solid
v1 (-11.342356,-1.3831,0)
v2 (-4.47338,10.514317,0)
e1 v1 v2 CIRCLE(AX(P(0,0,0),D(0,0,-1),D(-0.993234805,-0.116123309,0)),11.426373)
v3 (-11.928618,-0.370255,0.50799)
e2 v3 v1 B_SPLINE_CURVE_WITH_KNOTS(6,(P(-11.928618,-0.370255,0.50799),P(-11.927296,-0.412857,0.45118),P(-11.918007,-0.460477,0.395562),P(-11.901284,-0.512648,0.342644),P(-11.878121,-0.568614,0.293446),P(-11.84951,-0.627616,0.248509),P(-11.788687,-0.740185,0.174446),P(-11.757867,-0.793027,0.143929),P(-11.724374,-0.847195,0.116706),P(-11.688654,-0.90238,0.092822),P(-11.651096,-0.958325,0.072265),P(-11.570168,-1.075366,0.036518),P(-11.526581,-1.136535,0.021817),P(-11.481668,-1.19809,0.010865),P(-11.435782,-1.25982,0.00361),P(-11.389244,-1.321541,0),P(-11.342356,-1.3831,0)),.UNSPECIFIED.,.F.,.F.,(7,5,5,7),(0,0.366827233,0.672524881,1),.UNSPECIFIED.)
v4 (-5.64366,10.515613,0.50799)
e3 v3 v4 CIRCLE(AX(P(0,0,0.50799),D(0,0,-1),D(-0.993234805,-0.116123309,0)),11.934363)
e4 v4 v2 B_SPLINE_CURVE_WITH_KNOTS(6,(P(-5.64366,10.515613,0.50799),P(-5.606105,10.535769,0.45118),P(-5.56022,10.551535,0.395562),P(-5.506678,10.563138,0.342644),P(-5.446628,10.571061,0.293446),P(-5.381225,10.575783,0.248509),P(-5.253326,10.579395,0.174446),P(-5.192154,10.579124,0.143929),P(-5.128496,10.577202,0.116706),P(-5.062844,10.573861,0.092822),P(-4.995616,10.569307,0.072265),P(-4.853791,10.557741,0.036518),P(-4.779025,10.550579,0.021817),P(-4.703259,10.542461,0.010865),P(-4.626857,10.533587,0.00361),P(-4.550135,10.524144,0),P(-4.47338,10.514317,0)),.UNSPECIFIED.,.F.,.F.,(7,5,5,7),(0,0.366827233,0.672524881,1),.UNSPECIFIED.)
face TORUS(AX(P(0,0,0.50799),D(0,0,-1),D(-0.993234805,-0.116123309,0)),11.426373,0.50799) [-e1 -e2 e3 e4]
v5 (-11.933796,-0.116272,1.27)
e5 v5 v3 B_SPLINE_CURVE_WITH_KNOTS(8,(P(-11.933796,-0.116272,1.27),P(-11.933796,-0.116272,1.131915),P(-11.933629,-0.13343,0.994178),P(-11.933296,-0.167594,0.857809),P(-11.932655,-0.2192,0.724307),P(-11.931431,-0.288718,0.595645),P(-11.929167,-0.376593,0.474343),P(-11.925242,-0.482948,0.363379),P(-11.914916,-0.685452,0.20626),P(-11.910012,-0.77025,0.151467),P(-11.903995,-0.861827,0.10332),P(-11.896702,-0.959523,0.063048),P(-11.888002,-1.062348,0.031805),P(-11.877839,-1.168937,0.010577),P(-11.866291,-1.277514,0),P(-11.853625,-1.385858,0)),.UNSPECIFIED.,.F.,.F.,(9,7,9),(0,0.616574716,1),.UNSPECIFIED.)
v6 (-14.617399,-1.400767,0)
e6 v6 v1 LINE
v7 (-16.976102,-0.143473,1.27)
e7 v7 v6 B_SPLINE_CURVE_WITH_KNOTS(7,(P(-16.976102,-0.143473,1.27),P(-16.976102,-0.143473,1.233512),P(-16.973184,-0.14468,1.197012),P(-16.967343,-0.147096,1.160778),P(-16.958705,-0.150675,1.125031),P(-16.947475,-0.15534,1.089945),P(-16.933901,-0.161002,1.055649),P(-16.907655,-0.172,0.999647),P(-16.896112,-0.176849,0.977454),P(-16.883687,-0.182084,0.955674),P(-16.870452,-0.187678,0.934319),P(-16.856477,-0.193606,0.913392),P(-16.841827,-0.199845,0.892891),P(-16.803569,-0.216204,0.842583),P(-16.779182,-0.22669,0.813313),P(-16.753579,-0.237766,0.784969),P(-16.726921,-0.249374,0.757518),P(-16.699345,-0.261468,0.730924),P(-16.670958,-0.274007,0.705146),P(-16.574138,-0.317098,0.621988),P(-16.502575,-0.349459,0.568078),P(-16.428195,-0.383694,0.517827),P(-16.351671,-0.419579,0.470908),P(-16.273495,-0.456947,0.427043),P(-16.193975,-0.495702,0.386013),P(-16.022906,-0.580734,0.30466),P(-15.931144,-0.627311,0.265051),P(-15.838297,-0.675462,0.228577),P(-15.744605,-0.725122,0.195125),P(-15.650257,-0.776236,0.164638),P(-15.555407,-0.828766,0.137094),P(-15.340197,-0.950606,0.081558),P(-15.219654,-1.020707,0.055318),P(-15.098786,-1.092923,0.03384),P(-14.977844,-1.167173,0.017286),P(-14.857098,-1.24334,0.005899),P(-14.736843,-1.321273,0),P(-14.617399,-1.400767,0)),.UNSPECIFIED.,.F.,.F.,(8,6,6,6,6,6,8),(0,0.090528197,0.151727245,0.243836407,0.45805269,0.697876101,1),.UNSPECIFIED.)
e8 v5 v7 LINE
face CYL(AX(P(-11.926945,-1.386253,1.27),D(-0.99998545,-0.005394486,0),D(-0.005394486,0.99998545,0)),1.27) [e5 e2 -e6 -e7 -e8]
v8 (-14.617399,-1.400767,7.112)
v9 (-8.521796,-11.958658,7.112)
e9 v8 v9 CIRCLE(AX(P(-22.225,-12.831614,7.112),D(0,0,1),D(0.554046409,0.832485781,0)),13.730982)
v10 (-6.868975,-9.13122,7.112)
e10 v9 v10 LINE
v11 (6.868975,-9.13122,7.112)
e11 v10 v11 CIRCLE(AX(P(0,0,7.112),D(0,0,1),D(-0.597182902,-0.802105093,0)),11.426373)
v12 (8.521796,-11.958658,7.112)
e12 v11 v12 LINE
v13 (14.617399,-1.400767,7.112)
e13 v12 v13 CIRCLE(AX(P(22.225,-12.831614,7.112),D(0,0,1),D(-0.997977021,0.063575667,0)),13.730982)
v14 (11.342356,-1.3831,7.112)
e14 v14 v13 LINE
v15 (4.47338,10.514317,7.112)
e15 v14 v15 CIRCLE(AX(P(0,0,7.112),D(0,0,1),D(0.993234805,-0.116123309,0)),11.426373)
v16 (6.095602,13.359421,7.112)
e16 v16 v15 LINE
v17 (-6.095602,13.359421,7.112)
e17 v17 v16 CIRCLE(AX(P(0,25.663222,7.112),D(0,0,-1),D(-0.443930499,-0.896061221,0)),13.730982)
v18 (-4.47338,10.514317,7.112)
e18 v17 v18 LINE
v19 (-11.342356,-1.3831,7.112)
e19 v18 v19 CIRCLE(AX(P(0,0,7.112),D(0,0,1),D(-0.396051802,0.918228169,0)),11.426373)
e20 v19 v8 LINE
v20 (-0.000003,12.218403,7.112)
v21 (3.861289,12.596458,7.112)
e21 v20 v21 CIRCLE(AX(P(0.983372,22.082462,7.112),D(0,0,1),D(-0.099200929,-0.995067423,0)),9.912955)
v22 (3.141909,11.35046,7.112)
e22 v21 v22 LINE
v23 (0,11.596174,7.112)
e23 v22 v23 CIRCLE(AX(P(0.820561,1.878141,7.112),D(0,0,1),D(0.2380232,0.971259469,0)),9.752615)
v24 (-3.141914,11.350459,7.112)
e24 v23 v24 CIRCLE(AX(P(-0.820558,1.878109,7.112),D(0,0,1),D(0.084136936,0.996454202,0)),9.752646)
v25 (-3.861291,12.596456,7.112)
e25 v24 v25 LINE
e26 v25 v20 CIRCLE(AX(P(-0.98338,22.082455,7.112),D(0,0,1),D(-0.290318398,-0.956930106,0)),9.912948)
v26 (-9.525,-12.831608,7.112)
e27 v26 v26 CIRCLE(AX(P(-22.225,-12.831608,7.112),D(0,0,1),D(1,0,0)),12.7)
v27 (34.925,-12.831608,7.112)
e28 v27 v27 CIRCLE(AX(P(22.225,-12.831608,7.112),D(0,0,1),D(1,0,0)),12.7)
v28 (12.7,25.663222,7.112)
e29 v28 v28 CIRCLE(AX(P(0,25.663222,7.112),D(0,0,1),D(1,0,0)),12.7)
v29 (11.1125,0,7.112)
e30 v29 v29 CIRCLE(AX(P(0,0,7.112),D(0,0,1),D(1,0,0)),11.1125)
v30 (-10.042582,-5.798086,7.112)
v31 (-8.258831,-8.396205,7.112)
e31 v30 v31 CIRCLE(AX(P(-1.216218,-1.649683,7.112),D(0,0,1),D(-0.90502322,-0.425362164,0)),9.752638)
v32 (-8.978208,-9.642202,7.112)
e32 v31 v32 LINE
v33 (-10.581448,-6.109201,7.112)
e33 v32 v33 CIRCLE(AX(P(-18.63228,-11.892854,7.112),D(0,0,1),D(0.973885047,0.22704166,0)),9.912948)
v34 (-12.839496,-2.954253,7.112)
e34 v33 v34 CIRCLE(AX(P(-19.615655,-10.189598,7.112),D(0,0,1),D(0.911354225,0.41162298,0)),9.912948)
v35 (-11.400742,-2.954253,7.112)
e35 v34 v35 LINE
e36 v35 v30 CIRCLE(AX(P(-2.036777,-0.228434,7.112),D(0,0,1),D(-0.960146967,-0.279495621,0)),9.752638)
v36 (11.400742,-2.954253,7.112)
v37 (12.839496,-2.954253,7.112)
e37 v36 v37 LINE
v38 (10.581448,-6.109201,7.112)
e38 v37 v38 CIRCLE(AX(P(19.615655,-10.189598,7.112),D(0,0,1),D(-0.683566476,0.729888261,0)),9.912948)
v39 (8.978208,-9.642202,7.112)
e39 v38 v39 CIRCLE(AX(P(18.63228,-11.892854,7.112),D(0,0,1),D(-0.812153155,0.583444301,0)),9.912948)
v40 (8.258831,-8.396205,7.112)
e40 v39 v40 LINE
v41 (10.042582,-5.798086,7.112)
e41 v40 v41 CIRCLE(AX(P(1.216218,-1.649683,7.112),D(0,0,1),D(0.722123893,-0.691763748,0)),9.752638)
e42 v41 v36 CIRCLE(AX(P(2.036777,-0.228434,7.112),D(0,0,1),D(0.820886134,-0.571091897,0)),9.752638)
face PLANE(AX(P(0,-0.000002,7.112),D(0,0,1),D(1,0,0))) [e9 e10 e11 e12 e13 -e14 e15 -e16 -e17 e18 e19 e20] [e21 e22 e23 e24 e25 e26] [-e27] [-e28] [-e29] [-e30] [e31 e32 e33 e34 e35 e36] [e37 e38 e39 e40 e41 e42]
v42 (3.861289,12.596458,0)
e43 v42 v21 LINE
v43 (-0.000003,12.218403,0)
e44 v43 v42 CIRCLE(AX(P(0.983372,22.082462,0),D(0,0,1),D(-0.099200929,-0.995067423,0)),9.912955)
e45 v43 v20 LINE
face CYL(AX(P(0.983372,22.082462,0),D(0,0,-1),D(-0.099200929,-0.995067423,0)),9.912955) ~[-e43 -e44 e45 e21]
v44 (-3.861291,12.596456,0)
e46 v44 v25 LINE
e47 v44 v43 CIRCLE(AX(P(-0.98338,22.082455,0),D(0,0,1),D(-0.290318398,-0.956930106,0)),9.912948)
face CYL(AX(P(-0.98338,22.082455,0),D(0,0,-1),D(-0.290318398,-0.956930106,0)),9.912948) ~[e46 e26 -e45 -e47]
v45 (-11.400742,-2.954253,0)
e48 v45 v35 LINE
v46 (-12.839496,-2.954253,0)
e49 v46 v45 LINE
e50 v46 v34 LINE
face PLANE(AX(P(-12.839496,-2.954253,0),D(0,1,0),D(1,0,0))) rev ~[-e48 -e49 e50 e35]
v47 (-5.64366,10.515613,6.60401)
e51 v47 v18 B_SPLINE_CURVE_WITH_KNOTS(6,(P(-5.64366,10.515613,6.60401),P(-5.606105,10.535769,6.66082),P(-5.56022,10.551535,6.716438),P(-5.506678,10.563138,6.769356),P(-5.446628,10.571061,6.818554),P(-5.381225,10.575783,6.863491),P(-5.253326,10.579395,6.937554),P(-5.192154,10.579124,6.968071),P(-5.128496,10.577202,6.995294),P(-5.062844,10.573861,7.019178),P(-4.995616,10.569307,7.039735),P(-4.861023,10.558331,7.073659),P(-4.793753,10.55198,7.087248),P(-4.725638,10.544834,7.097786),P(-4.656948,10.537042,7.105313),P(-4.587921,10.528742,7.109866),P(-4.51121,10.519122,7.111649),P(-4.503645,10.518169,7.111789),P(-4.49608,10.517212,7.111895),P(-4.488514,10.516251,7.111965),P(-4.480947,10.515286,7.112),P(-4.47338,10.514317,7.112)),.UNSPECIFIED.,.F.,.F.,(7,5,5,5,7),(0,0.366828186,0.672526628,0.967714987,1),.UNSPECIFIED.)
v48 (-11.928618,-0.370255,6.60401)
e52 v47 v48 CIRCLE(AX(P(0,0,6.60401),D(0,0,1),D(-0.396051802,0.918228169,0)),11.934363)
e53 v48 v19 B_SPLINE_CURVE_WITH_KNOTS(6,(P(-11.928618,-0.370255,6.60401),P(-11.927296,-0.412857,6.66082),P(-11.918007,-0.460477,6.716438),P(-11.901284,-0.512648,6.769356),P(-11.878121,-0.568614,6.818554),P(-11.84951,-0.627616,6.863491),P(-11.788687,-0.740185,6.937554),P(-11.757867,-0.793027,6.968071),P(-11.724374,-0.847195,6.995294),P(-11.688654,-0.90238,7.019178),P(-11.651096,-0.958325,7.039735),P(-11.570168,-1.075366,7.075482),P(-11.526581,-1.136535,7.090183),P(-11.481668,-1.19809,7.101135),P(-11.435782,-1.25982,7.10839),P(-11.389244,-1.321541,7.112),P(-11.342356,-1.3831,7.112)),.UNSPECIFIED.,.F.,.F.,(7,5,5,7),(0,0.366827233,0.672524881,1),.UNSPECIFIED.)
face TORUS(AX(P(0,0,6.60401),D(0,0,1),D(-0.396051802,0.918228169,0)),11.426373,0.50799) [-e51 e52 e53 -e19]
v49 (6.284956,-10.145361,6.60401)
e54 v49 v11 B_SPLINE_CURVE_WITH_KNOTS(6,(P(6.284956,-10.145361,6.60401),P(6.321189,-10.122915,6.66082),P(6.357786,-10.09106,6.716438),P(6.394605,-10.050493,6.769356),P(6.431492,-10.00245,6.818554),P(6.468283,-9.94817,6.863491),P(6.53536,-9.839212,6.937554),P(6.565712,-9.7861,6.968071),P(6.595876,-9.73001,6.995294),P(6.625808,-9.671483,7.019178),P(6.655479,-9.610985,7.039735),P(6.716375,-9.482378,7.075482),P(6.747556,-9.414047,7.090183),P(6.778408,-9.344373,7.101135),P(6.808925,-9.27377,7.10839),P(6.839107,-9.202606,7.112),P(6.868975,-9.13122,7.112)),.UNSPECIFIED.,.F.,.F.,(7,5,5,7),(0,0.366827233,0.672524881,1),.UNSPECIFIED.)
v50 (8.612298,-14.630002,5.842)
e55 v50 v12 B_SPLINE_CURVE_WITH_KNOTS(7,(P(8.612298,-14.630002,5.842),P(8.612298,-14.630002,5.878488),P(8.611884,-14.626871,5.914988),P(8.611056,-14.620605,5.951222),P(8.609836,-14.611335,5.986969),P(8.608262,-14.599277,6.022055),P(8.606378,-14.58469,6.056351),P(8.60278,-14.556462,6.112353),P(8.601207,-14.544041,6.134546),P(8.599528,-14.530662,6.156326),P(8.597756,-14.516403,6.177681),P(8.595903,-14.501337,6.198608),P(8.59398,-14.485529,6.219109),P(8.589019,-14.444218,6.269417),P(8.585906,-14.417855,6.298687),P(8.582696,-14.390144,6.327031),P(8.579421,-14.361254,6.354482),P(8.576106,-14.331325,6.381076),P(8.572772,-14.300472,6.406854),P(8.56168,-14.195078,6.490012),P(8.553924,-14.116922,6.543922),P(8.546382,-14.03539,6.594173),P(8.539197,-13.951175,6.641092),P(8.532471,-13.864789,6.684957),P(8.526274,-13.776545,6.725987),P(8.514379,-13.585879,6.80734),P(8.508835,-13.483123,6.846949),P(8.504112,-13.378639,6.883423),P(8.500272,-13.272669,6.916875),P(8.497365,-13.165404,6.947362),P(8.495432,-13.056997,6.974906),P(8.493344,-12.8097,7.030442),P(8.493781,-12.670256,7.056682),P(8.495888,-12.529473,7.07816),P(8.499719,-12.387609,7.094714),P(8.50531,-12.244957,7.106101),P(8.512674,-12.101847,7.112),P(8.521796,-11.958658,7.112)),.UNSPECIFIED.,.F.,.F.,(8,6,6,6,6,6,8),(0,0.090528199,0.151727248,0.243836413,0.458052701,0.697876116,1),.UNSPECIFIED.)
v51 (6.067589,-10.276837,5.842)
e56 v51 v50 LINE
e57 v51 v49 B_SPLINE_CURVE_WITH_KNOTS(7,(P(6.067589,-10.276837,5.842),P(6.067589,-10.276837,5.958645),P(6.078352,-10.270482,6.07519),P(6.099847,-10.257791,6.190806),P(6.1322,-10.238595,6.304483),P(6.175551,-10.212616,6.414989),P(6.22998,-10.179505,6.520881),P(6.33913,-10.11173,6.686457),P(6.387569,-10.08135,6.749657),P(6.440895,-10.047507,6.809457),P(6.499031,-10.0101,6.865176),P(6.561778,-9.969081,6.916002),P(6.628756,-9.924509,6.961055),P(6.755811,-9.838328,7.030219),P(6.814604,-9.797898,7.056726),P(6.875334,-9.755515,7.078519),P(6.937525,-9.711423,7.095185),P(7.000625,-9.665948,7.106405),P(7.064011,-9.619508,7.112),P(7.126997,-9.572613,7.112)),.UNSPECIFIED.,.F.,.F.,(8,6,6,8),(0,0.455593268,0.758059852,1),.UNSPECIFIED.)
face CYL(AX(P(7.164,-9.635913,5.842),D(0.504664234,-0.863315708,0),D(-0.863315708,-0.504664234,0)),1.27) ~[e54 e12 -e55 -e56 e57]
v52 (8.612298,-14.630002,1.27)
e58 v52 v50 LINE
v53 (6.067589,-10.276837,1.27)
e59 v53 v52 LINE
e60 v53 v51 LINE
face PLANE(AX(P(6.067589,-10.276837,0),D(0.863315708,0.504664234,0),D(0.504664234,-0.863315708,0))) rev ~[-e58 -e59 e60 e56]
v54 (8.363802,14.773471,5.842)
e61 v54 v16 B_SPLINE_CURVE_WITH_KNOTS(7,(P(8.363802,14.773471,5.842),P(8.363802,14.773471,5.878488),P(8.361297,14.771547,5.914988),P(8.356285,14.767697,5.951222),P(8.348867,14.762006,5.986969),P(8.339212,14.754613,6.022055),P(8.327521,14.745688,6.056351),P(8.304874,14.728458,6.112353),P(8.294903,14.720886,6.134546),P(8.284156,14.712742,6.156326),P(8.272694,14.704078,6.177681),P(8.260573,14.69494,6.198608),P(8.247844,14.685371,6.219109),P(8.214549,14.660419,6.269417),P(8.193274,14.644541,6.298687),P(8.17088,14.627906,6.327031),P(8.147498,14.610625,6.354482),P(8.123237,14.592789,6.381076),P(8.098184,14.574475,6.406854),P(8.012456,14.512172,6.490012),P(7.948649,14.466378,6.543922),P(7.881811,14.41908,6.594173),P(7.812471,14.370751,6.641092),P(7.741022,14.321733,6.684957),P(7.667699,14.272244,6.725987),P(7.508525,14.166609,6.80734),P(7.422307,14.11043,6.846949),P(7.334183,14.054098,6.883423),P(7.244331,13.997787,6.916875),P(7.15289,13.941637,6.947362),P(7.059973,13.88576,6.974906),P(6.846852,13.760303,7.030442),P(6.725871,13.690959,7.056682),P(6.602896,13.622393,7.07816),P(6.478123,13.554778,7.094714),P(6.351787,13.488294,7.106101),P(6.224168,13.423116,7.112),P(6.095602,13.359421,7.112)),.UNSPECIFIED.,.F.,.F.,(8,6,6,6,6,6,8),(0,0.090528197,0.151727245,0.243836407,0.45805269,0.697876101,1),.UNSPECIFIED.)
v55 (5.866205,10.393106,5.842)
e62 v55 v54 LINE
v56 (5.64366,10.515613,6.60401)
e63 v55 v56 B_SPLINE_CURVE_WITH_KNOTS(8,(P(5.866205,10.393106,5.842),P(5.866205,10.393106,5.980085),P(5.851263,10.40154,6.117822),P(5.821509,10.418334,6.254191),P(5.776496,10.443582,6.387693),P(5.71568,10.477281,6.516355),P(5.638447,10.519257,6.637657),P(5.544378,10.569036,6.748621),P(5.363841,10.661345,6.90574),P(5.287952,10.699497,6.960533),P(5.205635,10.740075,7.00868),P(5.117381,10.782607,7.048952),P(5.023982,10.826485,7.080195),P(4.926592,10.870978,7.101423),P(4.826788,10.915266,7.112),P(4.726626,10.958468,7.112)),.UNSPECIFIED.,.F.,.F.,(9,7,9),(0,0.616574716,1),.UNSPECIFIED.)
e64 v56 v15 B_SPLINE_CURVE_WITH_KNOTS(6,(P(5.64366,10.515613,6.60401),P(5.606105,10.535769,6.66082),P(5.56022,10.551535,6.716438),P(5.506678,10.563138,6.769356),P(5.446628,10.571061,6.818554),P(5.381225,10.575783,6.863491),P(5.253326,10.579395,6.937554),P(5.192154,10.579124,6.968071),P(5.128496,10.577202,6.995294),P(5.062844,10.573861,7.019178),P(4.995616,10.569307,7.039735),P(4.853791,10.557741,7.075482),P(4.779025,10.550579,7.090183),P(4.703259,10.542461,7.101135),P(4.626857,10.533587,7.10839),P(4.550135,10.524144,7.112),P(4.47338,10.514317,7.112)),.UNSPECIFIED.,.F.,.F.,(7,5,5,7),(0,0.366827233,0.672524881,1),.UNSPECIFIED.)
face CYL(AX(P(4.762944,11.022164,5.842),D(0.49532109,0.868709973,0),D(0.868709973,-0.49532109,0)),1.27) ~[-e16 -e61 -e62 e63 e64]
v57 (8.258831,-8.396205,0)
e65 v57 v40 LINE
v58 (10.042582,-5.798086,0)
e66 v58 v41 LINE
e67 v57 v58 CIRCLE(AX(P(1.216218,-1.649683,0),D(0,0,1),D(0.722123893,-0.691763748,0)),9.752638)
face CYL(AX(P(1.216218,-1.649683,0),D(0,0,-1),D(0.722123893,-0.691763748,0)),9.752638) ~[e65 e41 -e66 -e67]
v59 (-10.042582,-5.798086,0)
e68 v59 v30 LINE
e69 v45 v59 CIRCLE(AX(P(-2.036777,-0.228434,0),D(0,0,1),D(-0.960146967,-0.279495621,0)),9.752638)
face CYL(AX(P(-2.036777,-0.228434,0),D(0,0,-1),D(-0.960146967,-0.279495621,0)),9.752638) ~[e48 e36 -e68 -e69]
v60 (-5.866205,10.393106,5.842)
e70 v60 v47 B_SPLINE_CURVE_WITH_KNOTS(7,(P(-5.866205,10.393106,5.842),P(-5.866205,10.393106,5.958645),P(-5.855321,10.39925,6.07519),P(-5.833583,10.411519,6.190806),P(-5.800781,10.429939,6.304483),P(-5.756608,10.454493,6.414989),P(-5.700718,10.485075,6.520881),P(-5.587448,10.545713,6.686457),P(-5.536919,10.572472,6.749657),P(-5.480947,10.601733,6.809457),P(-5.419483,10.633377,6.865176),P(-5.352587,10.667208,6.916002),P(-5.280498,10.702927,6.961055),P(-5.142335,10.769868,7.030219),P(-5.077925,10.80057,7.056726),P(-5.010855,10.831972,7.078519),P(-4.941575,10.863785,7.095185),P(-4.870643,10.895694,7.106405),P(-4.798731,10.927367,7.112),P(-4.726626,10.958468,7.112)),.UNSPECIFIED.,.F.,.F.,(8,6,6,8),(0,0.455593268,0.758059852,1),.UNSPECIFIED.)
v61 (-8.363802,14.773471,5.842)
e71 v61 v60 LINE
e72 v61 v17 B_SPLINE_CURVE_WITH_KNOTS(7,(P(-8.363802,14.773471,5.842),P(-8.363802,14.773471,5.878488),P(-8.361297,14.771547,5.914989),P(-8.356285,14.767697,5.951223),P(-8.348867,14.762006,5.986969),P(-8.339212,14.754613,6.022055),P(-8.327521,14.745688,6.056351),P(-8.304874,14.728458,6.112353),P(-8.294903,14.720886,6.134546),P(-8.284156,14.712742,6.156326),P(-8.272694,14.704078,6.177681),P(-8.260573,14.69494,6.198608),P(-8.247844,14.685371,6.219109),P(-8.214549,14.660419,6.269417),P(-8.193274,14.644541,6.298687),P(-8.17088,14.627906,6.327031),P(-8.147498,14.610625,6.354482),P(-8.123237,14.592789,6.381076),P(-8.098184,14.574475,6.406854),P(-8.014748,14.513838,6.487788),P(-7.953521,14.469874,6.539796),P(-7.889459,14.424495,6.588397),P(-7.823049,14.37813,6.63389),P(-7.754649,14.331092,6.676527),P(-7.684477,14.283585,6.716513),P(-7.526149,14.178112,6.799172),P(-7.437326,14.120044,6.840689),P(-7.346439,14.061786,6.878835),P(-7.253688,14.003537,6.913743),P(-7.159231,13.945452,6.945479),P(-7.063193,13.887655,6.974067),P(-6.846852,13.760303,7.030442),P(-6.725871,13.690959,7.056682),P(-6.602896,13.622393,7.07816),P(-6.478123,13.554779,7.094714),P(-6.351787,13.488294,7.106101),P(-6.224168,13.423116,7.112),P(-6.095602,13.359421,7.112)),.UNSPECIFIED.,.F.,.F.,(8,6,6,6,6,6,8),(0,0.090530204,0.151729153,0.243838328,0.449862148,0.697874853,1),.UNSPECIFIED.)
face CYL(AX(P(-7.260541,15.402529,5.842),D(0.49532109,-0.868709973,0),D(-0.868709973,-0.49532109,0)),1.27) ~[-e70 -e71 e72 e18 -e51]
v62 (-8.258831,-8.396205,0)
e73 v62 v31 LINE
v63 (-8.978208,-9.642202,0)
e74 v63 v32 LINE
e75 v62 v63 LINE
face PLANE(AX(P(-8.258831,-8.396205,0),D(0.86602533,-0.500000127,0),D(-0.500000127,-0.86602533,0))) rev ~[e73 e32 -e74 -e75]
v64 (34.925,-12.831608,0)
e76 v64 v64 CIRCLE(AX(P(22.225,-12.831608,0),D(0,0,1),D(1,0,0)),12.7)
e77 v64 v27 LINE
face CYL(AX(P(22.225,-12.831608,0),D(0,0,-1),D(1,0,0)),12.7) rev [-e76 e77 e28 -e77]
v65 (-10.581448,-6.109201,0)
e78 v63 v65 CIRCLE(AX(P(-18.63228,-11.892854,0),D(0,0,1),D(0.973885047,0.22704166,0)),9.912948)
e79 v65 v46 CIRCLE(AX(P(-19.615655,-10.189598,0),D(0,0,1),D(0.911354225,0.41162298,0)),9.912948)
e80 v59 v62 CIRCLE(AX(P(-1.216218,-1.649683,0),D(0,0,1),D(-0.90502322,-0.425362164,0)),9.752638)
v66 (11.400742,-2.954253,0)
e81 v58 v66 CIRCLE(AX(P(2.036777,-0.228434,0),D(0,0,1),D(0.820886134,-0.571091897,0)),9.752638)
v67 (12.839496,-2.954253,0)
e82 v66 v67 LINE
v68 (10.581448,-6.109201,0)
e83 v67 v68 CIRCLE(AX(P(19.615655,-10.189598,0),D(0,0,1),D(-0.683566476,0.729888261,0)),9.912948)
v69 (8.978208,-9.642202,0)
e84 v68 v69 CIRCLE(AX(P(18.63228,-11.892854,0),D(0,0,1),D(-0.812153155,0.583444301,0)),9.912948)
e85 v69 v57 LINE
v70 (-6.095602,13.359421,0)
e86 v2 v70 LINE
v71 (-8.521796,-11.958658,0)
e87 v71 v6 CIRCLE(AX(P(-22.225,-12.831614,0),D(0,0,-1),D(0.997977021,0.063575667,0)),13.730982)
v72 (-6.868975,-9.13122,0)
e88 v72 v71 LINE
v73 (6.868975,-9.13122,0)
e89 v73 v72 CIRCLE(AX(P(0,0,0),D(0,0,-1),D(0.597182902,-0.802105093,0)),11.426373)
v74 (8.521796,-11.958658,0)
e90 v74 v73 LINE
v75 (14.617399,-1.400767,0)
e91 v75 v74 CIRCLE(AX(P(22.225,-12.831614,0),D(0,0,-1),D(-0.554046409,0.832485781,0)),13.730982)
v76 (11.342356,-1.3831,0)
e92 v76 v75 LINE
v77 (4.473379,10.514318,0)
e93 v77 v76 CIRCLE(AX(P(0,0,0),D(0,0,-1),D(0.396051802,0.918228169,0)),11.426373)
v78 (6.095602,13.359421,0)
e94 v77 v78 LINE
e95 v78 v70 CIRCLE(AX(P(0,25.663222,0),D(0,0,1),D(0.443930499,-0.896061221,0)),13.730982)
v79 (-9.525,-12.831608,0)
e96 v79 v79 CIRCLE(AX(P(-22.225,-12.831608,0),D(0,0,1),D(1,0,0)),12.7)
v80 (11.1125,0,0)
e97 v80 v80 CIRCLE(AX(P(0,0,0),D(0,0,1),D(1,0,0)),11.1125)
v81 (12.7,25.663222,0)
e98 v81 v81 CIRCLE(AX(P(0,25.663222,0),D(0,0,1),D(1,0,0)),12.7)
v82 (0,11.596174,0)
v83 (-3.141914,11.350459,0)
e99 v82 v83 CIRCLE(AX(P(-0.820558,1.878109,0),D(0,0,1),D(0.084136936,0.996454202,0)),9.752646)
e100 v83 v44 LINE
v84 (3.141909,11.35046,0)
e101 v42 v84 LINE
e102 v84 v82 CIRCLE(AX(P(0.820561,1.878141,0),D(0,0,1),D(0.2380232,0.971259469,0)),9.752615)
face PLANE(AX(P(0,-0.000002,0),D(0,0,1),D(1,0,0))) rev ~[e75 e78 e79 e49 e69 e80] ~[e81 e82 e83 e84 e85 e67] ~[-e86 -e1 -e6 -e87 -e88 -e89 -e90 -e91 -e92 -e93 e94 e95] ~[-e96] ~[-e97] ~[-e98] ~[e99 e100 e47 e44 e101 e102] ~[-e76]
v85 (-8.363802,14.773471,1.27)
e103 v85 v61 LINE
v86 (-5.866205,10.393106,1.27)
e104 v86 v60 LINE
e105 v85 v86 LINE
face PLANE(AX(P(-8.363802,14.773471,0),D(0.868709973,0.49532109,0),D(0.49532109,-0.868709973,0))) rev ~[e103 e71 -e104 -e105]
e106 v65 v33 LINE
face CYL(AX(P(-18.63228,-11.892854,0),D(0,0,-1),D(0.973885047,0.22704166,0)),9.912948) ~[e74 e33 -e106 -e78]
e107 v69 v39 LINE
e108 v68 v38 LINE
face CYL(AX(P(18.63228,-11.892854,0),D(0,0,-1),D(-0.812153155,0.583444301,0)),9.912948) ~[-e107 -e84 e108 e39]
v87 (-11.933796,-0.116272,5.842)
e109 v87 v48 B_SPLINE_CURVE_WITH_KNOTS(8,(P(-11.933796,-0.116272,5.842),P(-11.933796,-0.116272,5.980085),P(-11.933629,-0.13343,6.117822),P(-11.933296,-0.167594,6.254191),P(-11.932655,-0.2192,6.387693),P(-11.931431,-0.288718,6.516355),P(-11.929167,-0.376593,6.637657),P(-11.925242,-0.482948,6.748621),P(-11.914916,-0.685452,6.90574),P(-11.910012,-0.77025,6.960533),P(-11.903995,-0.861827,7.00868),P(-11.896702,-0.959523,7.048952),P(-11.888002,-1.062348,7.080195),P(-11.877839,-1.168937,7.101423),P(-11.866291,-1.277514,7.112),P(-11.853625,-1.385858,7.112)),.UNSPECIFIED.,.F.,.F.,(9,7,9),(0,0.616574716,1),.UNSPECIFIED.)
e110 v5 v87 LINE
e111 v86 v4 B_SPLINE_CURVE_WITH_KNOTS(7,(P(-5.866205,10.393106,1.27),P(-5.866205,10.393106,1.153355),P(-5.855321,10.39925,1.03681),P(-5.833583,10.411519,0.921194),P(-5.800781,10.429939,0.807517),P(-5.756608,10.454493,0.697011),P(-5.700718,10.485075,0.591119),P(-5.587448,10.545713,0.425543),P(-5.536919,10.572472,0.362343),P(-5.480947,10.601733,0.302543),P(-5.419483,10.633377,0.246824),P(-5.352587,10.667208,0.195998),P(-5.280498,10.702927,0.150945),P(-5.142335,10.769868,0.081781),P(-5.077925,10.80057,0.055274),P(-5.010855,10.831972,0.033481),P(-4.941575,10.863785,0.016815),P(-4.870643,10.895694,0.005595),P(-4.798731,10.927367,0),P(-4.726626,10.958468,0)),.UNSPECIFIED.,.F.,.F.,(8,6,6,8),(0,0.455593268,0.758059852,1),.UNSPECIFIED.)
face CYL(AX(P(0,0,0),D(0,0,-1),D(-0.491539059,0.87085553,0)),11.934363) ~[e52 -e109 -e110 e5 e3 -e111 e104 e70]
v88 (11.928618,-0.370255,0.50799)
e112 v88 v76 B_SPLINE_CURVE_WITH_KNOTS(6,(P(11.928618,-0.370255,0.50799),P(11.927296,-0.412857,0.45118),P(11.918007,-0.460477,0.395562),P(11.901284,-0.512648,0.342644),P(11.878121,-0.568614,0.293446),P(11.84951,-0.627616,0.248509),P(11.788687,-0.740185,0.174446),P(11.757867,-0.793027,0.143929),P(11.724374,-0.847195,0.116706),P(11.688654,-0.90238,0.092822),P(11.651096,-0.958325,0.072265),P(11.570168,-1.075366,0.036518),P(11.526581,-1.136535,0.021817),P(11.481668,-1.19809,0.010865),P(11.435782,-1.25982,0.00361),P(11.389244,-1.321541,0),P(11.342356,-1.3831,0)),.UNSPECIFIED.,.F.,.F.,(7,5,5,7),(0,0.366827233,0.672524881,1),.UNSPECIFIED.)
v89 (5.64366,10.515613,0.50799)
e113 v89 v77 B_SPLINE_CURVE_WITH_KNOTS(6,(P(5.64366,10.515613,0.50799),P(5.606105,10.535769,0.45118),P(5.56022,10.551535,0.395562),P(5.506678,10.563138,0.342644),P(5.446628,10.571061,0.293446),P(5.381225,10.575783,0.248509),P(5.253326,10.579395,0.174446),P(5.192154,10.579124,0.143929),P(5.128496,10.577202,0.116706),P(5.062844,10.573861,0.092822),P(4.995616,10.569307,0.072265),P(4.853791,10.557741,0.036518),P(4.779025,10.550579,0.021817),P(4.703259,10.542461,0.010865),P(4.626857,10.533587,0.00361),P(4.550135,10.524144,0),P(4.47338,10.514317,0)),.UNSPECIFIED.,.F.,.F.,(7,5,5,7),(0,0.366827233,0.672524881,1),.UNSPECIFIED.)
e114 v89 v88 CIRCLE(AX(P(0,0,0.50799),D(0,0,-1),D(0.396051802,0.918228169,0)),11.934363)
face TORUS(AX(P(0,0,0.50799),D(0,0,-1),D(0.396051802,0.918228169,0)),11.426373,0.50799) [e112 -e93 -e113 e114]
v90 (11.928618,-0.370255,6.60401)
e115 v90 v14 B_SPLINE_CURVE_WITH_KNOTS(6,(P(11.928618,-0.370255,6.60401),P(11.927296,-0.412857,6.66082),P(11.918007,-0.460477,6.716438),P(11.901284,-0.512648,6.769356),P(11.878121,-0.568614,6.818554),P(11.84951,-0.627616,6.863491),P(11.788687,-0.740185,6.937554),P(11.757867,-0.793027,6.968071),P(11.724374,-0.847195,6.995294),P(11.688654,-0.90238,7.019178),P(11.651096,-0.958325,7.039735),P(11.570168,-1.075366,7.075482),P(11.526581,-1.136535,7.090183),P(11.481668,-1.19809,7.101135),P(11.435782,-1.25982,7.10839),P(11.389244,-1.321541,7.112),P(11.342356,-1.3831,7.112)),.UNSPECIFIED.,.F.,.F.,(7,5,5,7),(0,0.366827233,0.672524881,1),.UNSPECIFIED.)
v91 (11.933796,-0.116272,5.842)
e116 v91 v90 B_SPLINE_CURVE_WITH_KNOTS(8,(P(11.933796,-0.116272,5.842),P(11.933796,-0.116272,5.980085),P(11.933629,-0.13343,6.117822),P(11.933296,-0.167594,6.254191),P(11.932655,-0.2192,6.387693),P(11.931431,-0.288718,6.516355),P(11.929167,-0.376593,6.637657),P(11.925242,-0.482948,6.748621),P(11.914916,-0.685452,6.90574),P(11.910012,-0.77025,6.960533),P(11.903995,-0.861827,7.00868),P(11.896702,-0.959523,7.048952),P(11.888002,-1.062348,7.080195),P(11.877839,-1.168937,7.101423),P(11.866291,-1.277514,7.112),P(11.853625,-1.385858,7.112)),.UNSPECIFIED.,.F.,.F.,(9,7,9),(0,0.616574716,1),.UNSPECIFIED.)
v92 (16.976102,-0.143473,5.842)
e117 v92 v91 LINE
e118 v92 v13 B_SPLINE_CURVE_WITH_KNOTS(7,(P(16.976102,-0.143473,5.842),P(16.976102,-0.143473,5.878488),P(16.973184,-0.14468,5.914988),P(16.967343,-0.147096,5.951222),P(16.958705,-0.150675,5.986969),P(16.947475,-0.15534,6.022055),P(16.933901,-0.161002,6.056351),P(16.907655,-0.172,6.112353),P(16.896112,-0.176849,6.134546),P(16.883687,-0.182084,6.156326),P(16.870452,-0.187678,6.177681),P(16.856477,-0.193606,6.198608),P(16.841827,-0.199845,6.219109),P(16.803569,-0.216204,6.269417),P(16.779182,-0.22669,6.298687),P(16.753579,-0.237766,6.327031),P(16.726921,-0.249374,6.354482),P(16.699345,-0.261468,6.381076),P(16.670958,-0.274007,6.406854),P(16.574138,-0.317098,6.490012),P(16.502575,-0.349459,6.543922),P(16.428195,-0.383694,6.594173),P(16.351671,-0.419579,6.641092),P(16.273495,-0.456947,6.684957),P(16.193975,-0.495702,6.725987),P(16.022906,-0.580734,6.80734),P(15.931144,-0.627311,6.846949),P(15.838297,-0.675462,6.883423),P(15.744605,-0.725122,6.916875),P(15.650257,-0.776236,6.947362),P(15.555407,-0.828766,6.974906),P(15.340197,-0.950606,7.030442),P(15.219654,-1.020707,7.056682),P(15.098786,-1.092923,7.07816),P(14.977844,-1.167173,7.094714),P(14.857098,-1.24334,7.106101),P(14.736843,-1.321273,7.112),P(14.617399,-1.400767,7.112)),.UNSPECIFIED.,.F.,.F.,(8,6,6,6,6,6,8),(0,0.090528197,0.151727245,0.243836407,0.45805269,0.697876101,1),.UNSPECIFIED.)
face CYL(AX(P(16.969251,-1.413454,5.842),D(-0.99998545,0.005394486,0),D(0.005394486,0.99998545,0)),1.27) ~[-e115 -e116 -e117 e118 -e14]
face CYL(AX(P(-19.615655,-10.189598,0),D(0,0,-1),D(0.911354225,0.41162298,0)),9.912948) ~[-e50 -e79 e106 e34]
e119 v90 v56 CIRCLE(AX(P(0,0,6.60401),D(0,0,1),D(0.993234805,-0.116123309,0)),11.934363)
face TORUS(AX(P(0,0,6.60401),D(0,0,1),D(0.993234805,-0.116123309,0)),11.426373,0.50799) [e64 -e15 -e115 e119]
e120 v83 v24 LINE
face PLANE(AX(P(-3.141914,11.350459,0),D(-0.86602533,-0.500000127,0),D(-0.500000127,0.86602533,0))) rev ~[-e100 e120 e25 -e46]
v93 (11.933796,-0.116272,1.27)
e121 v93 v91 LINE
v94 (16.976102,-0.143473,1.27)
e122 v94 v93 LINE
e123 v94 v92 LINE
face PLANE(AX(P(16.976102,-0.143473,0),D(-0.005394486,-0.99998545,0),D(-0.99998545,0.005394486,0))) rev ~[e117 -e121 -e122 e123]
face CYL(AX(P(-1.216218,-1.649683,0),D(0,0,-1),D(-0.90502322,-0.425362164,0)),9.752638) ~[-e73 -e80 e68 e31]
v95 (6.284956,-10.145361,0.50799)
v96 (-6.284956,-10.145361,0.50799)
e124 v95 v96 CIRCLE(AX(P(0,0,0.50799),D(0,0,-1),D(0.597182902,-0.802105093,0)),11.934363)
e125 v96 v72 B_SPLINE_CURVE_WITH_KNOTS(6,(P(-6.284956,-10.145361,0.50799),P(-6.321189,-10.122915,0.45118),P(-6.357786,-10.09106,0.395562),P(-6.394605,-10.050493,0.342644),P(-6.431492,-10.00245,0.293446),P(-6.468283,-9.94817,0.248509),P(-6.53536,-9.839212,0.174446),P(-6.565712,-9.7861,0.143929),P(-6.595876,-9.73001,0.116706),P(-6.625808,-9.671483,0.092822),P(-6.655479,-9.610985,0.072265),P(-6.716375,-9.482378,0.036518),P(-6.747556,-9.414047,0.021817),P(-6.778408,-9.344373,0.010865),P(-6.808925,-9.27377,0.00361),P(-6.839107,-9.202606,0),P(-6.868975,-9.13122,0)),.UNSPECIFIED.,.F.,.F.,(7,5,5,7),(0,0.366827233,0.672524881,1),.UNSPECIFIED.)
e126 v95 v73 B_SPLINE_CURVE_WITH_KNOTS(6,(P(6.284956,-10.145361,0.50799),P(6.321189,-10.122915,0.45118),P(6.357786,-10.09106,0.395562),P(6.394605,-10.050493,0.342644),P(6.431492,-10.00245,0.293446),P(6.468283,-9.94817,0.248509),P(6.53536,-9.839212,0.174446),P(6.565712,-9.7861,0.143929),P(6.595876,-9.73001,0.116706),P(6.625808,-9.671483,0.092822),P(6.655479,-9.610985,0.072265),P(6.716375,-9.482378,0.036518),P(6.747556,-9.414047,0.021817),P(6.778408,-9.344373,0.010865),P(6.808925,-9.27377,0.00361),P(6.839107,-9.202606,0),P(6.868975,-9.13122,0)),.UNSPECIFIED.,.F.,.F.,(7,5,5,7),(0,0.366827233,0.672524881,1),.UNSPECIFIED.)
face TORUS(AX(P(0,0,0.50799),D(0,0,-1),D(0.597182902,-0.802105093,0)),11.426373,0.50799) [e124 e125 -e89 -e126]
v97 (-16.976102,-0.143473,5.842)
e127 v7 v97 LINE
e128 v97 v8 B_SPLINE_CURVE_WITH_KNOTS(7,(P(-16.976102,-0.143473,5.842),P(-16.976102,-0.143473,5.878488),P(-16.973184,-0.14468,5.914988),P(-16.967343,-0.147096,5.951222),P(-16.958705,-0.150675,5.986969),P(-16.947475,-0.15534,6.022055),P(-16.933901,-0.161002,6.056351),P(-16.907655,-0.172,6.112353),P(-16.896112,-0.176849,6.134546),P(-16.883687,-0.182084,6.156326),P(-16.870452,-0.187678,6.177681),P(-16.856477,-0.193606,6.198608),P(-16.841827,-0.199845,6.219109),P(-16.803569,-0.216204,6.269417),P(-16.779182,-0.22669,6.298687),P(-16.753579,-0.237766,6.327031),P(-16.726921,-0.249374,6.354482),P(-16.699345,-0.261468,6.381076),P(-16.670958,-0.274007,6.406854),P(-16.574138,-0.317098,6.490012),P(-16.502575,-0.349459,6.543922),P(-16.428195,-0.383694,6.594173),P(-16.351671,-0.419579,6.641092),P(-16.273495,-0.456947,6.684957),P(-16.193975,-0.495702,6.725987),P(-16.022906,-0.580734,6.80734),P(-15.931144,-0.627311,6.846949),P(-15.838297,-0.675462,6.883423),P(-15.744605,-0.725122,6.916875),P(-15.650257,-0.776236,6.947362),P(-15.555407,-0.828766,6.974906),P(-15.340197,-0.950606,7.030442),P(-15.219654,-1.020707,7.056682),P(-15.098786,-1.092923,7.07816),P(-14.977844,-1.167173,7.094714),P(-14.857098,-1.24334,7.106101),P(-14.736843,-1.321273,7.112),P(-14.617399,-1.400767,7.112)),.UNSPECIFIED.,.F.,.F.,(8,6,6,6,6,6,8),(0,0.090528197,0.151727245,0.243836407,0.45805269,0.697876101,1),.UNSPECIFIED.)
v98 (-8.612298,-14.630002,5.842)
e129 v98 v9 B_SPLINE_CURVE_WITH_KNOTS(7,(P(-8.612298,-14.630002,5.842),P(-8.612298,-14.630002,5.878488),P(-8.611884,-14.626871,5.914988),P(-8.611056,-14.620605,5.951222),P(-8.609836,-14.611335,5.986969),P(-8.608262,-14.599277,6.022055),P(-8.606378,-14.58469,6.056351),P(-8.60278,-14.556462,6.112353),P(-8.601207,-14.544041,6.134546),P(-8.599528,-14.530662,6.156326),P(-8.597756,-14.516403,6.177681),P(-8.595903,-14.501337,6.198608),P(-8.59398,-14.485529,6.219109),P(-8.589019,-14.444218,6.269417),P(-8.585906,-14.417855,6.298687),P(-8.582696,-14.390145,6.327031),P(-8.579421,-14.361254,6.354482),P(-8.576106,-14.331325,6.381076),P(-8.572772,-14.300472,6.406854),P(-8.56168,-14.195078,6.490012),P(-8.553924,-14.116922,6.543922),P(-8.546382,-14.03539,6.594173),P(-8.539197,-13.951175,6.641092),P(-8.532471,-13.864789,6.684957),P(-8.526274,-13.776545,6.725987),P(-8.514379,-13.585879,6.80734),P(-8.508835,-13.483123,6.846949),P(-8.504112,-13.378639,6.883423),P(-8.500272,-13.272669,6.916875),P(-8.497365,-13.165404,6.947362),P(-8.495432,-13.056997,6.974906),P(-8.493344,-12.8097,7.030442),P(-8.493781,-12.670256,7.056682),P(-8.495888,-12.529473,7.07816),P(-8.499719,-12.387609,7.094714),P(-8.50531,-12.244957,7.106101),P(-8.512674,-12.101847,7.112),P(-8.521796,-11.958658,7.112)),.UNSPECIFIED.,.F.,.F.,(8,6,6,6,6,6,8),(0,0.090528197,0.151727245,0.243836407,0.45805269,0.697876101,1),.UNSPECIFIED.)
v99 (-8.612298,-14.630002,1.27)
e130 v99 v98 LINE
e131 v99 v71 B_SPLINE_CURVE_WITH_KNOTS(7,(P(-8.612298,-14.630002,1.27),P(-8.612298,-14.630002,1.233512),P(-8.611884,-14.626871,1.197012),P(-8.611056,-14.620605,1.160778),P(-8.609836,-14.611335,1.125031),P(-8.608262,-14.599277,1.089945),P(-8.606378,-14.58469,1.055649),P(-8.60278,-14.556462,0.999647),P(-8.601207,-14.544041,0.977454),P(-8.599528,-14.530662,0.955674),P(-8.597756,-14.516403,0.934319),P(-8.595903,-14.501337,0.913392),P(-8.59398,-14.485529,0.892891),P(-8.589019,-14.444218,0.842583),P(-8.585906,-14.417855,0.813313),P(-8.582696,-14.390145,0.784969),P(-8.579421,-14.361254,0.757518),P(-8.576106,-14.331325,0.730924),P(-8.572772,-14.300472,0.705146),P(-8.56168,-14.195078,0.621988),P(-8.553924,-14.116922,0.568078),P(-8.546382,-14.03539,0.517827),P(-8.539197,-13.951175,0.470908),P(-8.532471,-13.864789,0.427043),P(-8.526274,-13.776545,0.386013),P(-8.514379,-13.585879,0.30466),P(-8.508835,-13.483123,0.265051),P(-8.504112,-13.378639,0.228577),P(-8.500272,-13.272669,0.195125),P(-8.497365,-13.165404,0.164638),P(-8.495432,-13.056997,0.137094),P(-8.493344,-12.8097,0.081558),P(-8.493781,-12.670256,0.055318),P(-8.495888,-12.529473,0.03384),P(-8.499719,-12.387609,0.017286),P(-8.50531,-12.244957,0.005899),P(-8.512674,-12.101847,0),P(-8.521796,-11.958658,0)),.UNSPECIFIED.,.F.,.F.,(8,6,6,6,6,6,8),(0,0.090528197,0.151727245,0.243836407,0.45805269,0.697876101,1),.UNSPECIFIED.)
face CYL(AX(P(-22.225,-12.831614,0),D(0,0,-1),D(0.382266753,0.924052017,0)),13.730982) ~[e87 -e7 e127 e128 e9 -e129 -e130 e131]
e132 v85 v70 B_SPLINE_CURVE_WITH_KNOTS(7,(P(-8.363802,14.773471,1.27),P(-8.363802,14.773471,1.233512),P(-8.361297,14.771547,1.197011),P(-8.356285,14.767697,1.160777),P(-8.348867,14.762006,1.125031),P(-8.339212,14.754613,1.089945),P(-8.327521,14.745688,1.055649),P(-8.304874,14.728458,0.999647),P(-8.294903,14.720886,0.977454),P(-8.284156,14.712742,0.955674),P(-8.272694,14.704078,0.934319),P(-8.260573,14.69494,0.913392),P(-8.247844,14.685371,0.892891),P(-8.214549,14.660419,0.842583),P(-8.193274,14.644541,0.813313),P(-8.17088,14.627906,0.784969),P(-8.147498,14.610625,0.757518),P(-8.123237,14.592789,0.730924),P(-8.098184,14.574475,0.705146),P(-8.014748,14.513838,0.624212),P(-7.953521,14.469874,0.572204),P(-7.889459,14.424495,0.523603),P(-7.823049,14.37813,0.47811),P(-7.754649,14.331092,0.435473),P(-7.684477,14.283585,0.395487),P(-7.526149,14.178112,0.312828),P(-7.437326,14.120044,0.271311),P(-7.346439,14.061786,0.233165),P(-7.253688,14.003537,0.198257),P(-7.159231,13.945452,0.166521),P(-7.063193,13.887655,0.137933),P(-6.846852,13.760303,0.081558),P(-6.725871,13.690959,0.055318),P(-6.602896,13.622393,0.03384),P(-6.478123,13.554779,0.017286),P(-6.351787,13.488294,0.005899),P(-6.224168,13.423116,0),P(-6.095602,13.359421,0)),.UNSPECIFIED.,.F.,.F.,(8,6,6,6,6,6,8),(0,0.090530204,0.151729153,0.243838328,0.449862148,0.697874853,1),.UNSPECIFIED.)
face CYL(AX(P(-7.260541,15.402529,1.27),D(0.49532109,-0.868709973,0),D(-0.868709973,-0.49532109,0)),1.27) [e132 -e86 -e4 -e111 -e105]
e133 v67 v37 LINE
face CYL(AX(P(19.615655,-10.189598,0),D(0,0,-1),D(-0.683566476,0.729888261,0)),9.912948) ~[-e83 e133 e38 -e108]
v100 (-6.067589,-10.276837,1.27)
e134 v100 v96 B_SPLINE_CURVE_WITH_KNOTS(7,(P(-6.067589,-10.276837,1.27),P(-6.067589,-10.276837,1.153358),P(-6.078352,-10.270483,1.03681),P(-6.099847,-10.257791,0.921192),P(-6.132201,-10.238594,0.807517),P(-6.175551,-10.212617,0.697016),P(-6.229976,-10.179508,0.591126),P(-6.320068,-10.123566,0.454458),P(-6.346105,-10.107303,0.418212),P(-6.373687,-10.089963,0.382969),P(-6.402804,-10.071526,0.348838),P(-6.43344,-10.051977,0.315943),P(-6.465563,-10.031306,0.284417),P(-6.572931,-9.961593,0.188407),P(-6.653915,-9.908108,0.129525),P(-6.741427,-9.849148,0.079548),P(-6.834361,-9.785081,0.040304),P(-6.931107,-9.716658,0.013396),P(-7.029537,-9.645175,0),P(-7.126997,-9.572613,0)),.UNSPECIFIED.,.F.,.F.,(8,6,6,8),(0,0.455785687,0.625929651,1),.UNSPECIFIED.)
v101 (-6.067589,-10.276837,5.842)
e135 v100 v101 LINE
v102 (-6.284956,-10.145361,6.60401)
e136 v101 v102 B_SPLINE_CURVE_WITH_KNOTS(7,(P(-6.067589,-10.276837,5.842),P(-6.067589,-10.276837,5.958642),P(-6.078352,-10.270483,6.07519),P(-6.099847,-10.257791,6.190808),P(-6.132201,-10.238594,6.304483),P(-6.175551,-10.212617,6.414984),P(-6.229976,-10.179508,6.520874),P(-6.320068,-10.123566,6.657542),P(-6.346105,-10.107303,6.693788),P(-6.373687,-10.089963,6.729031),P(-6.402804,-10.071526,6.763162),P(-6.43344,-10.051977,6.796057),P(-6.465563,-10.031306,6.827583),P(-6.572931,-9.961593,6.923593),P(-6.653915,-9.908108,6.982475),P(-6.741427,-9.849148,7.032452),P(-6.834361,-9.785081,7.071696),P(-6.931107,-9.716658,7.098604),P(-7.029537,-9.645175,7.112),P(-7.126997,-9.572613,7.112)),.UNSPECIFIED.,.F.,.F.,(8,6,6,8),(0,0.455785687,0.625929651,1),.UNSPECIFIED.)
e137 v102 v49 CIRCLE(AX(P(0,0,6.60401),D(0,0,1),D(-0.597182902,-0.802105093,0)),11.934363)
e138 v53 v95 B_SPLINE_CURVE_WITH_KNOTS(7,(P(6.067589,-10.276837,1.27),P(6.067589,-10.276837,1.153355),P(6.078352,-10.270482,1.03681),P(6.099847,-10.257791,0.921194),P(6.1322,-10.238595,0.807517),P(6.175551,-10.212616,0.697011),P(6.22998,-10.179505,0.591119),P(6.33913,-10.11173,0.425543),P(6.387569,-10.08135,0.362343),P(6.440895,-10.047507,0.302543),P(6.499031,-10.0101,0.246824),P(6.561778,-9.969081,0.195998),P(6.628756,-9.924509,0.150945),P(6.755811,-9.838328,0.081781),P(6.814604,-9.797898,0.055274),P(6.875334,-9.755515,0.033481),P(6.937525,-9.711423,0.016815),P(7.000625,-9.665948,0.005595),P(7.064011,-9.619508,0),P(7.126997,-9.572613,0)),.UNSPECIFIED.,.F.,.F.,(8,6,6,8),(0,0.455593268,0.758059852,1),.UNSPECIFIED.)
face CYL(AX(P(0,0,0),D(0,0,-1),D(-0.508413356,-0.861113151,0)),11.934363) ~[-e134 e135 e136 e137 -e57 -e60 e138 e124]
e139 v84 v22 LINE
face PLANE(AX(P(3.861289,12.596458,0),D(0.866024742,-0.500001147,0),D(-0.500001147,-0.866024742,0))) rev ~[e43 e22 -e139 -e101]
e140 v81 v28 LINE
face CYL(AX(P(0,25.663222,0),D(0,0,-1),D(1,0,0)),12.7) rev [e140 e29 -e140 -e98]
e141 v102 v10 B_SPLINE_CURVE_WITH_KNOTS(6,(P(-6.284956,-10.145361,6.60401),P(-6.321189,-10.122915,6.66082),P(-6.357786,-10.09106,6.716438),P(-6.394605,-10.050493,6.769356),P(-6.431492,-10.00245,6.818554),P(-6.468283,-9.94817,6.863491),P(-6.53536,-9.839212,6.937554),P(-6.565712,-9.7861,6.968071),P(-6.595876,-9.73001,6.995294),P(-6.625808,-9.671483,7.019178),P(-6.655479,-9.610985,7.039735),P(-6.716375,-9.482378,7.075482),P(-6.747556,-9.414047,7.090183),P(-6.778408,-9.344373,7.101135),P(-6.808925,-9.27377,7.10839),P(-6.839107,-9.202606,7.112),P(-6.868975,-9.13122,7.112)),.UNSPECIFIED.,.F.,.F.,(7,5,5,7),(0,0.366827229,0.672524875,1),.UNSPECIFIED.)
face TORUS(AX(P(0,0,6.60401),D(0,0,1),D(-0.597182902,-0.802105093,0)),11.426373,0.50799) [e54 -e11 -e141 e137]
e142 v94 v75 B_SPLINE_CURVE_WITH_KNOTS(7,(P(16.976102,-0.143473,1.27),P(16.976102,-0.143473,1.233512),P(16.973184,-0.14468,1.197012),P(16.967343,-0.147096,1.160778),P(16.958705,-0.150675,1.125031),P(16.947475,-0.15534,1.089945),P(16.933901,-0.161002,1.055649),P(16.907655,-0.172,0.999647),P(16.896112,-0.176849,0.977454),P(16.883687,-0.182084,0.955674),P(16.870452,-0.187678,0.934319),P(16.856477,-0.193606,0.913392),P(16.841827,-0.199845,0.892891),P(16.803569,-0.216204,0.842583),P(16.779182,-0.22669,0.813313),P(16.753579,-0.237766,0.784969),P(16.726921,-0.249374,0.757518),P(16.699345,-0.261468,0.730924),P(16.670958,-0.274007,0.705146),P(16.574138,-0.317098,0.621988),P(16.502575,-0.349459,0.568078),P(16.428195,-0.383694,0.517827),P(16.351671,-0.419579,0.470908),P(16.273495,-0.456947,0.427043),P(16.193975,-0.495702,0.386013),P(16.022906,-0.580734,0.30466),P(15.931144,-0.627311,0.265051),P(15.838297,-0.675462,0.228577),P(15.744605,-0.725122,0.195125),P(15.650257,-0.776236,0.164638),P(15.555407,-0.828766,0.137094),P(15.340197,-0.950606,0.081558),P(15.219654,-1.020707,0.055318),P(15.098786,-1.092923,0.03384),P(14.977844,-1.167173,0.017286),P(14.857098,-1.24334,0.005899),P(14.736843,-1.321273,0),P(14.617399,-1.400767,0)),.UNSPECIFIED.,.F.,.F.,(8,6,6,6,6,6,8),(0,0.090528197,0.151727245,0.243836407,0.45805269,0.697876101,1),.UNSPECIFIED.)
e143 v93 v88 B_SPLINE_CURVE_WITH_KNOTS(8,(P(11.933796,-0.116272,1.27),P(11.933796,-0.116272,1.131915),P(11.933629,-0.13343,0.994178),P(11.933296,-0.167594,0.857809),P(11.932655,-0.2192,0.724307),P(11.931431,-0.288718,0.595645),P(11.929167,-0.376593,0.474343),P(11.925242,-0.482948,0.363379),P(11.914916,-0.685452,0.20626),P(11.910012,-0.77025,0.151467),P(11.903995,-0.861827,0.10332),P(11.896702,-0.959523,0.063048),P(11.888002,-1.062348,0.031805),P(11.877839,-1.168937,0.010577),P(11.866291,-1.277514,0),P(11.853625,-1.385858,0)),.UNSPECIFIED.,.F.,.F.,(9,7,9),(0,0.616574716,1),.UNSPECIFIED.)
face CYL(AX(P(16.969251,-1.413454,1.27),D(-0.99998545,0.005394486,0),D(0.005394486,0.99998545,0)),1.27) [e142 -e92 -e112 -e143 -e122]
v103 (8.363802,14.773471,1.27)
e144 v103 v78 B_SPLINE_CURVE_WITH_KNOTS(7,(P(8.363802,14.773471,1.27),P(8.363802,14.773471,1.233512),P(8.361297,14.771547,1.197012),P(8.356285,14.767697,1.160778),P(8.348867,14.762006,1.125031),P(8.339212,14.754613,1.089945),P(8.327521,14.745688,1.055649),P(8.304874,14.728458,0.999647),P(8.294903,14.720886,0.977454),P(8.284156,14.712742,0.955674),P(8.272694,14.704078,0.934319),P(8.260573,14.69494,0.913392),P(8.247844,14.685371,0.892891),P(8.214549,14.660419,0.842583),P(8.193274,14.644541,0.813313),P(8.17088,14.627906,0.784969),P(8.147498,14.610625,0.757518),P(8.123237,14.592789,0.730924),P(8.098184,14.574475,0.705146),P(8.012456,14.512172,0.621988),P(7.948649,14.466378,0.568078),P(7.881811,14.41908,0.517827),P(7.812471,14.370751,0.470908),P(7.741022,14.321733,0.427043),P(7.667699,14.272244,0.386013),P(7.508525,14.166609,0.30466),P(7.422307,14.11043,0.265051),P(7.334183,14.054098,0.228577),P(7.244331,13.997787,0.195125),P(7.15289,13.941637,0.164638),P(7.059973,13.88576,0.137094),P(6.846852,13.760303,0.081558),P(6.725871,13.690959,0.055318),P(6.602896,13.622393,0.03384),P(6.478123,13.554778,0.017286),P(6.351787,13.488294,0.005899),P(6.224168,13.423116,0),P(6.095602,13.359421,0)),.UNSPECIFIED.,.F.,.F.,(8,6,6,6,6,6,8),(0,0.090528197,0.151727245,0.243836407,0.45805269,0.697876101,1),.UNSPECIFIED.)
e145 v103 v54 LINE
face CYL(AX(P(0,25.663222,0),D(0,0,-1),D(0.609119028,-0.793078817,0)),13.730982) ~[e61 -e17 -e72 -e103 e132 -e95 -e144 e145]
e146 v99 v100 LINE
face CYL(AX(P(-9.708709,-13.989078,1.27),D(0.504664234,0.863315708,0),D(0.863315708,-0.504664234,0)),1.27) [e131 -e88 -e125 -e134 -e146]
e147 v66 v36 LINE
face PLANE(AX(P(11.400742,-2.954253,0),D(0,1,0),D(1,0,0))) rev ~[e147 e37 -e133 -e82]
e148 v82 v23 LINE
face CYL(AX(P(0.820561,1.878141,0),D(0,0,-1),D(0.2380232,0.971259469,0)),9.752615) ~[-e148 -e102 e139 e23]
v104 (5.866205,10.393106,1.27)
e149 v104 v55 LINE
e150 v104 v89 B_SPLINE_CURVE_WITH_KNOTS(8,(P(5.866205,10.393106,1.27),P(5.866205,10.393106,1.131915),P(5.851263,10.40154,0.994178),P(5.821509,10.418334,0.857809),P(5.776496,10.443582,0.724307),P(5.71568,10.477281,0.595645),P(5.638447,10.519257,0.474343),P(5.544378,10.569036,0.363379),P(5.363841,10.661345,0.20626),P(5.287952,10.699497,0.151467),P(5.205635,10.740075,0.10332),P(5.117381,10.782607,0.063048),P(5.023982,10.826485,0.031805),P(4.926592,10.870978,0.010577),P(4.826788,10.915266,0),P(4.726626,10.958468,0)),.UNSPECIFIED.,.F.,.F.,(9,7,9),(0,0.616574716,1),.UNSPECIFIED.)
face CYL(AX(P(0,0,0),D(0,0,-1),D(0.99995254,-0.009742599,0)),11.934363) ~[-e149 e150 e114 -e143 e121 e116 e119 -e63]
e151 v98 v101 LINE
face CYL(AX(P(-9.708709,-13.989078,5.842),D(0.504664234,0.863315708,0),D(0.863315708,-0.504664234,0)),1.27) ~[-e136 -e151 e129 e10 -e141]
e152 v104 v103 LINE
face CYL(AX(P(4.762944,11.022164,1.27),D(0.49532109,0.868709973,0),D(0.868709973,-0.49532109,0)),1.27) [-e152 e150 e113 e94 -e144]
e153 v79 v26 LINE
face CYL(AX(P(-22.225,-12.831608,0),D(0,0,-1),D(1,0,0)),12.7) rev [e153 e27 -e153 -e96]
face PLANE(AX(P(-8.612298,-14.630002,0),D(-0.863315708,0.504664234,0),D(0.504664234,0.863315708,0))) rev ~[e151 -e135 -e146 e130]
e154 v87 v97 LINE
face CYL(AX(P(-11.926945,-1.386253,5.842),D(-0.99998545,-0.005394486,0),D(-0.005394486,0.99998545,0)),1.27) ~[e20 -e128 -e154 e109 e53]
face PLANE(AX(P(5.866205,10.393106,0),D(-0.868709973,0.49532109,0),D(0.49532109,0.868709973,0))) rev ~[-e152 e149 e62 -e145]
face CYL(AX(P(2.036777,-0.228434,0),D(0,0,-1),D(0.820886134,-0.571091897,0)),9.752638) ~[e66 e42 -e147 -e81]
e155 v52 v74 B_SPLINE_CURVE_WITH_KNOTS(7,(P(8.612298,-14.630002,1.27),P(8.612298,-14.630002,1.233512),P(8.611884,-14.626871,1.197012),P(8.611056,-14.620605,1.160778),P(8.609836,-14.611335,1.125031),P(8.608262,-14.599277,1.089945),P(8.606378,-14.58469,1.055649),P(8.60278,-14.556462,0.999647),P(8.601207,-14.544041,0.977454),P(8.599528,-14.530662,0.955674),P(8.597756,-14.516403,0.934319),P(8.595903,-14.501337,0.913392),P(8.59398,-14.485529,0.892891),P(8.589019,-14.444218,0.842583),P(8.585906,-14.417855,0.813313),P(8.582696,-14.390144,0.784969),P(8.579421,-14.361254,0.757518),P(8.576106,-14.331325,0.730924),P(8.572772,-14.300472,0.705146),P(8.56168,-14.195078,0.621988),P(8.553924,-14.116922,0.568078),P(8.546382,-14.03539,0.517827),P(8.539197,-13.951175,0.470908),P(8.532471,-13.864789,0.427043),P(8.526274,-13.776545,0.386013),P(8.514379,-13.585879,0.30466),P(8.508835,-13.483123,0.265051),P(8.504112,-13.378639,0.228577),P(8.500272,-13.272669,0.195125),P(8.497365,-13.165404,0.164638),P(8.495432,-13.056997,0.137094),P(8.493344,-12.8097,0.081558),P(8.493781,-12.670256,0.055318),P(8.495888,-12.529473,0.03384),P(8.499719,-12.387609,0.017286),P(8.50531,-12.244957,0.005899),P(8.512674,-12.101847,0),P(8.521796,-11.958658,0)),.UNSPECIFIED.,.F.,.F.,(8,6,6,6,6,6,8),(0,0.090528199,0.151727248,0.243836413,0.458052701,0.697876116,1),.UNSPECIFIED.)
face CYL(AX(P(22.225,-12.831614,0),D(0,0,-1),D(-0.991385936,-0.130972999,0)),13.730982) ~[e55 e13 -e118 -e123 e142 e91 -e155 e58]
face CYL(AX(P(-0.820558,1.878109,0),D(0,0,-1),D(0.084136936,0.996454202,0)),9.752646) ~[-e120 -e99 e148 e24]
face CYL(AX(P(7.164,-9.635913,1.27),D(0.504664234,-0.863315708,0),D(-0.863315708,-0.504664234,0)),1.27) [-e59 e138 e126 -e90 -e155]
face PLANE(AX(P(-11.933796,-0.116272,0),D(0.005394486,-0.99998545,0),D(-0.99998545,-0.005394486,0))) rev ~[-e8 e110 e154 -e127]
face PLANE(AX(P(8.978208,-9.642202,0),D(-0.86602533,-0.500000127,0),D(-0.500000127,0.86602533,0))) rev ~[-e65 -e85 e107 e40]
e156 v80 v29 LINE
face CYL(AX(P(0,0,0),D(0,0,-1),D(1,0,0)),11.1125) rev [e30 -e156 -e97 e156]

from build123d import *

# Parameters (mm, degrees)
F0_R     = 12.7
F0_R_2   = 11.1125
F1_DEPTH = 7.112
F2_R     = 1.27
F3_R     = 0.50799


# Not quite as in the source:
# - a fillet or chamfer is up to 0.001 mm smaller than in the source, because OpenCascade refuses the exact size
# - ends of sketch curves that miss each other by under 0.0002 mm in the source are joined


with BuildPart() as f1:
    # F0 (on Top) → F1 (new body)
    with BuildSketch(Plane.XY):
        with BuildLine():
            ThreePointArc((8.3638022209, 14.7734709329), (0, 39.3942033225), (-8.3638022209, 14.7734709329))
            Line((-8.3638022209, 14.7734709329), (-5.8662054787, 10.3931058657))
            ThreePointArc((-5.8662054787, 10.3931058657), (-10.3354618297, 5.9671806592), (-11.9337964262, -0.1162717145))
            Line((-11.9337964262, -0.1162717145), (-16.9761022194, -0.1434727603))
            ThreePointArc((-16.9761022194, -0.1434727603), (-34.1163779507, -19.6971066641), (-8.6122978741, -14.6300019249))
            Line((-8.6122978741, -14.6300019249), (-6.0675894575, -10.276836791))
            ThreePointArc((-6.0675894575, -10.276836791), (0, -11.934362834), (6.0675894575, -10.276836791))
            Line((6.0675894575, -10.276836791), (8.6122978741, -14.6300019249))
            ThreePointArc((8.6122978741, -14.6300019249), (34.1163779507, -19.6971066641), (16.9761022194, -0.1434727603))
            Line((16.9761022194, -0.1434727603), (11.9337964262, -0.1162717145))
            ThreePointArc((11.9337964262, -0.1162717145), (10.3354618297, 5.9671806592), (5.8662054787, 10.3931058657))
            Line((5.8662054787, 10.3931058657), (8.3638022209, 14.7734709329))
        make_face()
        with Locations((-22.225, -12.83160756)):
            Circle(F0_R, mode=Mode.SUBTRACT)
        with BuildLine():
            ThreePointArc((-8.9782080284, -9.6422017781), (-9.6052965229, -7.7965006784), (-10.5814479311, -6.109200777))
            ThreePointArc((-10.5814479311, -6.109200777), (-11.5546165578, -4.4201787661), (-12.8394961357, -2.9542534612))
            Line((-12.8394961357, -2.9542534612), (-11.4007424563, -2.9542534612))
            ThreePointArc((-11.4007424563, -2.9542534612), (-10.8372927454, -4.4313928826), (-10.042581953, -5.7980864121))
            ThreePointArc((-10.042581953, -5.7980864121), (-9.2563462346, -7.1696730271), (-8.258831006, -8.3962046475))
            Line((-8.258831006, -8.3962046475), (-8.9782080284, -9.6422017781))
        make_face(mode=Mode.SUBTRACT)
        with Locations((22.225, -12.83160756)):
            Circle(F0_R, mode=Mode.SUBTRACT)
        with BuildLine():
            Line((11.4007424563, -2.9542534612), (12.8394961357, -2.9542534612))
            ThreePointArc((12.8394961357, -2.9542534612), (11.5546165578, -4.4201787661), (10.5814479311, -6.109200777))
            ThreePointArc((10.5814479311, -6.109200777), (9.6052965229, -7.7965006784), (8.9782080284, -9.6422017781))
            Line((8.9782080284, -9.6422017781), (8.258831006, -8.3962046475))
            ThreePointArc((8.258831006, -8.3962046475), (9.2563462346, -7.1696730271), (10.042581953, -5.7980864121))
            ThreePointArc((10.042581953, -5.7980864121), (10.8372927454, -4.4313928826), (11.4007424563, -2.9542534612))
        make_face(mode=Mode.SUBTRACT)
        Circle(F0_R_2, mode=Mode.SUBTRACT)
        with BuildLine():
            ThreePointArc((-3.8612913684, 12.5964559897), (-1.9493229697, 12.2166805672), (-2.6876e-06, 12.2184031057))
            ThreePointArc((-2.6876e-06, 12.2184031057), (1.9493202828, 12.2166814247), (3.8612885145, 12.5964576884))
            Line((3.8612885145, 12.5964576884), (3.1419093526, 11.3504602412))
            ThreePointArc((3.1419093526, 11.3504602412), (1.5809467105, 11.6010677307), (0, 11.5961742969))
            ThreePointArc((0, 11.5961742969), (-1.5809492634, 11.6010670352), (-3.141914346, 11.350458859))
            Line((-3.141914346, 11.350458859), (-3.8612913684, 12.5964559897))
        make_face(mode=Mode.SUBTRACT)
        with Locations((0, 25.6632216382)):
            Circle(F0_R, mode=Mode.SUBTRACT)
    extrude(amount=F1_DEPTH)

    # F2
    f2_edges = [f1.edges().sort_by_distance(p)[0] for p in [
        (-7.339944, -12.453419, 7.112),
        (-14.454949, -0.129872, 7.112),
        (7.339944, -12.453419, 7.112),
        (14.454949, -0.129872, 7.112),
        (7.115004, 12.583288, 7.112),
        (-7.115004, 12.583288, 7.112),
        (-7.339944, -12.453419, 0),
        (7.339944, -12.453419, 0),
        (14.454949, -0.129872, 0),
        (7.115004, 12.583288, 0),
        (-7.115004, 12.583288, 0),
        (-14.454949, -0.129872, 0),
    ]]
    fillet(f2_edges, radius=F2_R)

    # F3 (radius 0.508 in the source; OpenCascade refuses exactly that, so slightly less here)
    f3_edges = [f1.edges().sort_by_distance(p)[0] for p in [
        (-10.335462, 5.967181, 7.112),
        (0, -11.934363, 7.112),
        (10.335462, 5.967181, 7.112),
        (10.335462, 5.967181, 0),
        (-10.335462, 5.967181, 0),
        (0, -11.934363, 0),
    ]]
    fillet(f3_edges, radius=F3_R)


solid = f1.part
